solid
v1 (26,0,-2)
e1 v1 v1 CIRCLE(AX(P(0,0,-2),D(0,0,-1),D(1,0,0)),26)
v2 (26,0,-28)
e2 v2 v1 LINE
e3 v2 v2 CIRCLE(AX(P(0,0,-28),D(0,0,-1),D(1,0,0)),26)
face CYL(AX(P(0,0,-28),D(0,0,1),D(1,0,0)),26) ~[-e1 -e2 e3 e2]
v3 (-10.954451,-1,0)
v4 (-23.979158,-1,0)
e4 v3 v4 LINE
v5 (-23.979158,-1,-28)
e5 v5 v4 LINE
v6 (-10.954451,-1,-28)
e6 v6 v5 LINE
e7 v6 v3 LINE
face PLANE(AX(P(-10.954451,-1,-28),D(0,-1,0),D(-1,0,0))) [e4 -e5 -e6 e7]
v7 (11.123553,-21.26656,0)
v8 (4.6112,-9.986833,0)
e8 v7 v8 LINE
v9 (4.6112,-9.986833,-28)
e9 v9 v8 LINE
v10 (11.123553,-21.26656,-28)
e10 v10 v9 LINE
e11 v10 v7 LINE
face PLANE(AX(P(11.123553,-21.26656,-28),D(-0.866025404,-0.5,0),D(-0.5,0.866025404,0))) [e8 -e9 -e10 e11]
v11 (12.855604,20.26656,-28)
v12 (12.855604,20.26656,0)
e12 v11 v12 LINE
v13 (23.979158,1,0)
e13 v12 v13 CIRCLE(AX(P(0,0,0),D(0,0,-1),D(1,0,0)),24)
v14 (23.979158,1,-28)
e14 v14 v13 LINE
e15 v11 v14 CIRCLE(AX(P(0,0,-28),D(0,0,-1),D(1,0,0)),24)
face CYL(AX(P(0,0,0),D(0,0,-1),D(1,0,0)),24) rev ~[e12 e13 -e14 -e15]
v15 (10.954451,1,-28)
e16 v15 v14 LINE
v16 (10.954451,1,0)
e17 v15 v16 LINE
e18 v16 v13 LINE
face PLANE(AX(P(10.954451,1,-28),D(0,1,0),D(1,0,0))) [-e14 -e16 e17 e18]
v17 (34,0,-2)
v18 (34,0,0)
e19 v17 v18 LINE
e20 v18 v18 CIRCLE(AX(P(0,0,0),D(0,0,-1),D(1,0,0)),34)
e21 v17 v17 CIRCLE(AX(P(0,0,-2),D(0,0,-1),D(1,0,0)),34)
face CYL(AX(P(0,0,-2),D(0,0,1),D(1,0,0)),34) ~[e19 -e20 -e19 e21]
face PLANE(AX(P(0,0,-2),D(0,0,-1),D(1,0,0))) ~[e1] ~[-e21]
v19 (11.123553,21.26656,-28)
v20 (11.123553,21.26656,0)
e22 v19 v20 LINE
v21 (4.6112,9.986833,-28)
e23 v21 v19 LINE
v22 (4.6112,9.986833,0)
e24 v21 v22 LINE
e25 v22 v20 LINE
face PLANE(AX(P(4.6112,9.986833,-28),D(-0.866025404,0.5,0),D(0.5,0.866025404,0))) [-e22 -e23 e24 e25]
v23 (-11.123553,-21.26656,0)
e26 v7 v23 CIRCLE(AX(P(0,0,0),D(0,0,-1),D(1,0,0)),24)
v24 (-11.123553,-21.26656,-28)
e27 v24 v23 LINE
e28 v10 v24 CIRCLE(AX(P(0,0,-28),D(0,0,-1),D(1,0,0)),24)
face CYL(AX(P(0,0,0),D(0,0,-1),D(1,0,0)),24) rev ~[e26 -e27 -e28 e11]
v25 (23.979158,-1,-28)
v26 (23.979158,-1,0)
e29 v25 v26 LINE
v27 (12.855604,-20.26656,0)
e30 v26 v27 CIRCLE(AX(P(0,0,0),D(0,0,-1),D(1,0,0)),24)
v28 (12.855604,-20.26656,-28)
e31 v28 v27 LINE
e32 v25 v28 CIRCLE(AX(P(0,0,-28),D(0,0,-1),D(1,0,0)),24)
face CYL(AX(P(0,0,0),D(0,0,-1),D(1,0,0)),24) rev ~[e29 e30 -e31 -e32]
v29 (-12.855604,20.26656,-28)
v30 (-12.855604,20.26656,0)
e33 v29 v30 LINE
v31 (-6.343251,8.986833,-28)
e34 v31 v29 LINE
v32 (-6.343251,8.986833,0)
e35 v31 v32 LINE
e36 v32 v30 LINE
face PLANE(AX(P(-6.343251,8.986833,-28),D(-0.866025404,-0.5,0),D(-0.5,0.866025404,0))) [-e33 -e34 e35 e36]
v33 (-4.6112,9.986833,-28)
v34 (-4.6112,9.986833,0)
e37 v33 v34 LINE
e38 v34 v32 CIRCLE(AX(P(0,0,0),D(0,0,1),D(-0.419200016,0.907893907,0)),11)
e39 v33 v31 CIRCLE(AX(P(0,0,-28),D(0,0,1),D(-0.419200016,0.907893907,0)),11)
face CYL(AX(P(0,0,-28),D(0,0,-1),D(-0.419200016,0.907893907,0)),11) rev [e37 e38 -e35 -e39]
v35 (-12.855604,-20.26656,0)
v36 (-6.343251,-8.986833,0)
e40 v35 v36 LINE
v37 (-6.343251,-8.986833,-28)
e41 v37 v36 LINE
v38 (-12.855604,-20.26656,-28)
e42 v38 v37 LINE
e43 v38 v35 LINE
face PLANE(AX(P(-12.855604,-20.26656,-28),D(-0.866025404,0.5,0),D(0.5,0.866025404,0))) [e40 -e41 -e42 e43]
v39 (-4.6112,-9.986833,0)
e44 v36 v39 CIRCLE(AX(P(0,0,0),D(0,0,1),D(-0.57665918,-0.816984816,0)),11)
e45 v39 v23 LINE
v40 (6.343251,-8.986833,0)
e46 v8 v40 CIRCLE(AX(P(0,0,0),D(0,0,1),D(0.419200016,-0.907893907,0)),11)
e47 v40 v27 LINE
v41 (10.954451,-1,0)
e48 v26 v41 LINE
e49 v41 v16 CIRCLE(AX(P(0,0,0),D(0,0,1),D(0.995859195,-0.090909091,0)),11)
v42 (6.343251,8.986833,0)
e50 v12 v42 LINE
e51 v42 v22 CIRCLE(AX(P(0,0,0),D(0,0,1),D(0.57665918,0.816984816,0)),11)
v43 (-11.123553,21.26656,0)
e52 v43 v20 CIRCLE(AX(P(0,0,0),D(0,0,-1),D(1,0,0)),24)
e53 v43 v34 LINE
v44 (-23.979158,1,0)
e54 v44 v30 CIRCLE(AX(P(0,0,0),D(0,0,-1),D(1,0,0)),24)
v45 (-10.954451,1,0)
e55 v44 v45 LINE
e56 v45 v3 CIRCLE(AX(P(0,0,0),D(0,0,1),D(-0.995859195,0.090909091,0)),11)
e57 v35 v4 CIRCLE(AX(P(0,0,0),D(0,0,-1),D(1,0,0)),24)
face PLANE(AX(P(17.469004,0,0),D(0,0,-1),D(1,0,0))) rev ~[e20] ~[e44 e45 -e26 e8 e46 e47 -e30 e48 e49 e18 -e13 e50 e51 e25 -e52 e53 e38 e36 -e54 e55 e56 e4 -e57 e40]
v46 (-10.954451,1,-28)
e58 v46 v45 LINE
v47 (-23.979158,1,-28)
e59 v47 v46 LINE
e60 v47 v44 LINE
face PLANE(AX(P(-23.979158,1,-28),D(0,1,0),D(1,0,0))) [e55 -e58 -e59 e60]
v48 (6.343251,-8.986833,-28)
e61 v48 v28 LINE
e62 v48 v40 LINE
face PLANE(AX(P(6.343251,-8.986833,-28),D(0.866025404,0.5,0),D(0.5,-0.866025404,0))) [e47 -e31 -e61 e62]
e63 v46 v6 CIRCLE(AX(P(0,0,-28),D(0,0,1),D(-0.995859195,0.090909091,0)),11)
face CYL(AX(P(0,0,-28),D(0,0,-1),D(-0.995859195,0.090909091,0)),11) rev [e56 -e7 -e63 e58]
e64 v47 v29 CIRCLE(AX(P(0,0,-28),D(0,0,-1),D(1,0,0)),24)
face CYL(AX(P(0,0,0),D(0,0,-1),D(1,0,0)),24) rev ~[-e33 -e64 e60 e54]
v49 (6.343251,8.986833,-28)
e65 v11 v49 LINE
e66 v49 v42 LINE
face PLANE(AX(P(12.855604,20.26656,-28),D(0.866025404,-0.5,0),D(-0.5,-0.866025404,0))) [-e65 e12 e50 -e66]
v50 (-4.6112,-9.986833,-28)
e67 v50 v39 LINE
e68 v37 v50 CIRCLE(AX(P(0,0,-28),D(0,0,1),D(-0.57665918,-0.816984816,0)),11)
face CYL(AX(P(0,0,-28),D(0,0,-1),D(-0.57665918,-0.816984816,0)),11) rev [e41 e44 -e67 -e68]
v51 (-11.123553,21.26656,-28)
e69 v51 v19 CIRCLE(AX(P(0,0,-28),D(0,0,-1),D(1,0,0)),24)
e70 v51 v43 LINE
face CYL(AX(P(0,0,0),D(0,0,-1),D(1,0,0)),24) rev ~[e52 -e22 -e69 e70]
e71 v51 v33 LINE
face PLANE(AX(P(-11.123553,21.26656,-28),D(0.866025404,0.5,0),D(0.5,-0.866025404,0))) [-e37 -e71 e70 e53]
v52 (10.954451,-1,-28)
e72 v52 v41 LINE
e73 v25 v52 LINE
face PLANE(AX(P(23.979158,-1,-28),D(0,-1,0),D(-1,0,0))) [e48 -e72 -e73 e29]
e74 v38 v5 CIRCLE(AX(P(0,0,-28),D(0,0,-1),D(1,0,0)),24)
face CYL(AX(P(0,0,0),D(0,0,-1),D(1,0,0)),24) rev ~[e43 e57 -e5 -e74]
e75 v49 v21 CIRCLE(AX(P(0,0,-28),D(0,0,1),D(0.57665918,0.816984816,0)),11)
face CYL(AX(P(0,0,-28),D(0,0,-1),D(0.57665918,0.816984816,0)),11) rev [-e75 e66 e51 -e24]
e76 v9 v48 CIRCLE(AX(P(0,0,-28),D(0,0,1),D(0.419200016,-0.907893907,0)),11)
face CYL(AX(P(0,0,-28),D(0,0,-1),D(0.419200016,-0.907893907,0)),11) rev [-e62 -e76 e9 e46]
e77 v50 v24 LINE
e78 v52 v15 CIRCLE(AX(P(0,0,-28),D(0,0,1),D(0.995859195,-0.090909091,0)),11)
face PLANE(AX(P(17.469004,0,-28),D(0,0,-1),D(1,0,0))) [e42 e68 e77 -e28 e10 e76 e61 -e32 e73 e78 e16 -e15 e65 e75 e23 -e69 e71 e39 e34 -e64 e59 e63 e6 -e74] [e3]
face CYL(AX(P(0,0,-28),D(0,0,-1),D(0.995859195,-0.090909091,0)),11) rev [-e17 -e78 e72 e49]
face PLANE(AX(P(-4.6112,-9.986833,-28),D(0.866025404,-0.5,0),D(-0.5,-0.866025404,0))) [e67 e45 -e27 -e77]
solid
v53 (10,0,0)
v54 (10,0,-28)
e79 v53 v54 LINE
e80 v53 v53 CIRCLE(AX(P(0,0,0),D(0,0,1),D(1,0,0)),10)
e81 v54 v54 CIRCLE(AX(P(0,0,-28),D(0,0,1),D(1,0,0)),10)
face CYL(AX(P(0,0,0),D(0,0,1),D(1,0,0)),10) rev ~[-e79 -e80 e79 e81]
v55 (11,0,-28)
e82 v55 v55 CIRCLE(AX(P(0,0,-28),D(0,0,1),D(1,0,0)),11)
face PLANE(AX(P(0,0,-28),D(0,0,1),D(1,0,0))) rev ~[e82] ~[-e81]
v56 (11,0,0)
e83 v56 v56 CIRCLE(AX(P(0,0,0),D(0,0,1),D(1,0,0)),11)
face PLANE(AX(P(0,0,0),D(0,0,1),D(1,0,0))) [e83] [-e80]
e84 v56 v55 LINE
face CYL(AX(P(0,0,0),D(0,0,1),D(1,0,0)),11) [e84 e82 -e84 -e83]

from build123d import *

# Parameters (mm, degrees)
F2_R     = 11
F2_R_2   = 10
F3_DEPTH = 28
F5_DEPTH = 28


with BuildPart() as f1:
    # F0 (on Front) → F1 (revolve)
    with BuildSketch(Plane.XZ):
        Polygon((34, 0), (24, 0), (24, -28), (26, -28), (26, -2), (34, -2), align=None)
    revolve(axis=Axis((0, 0, -3.8373200223), (0, 0, -1)))

    # F4 (on face) → F5 (join, through all)
    with BuildSketch(Plane(origin=(0, 0, -28), x_dir=(1, 0, 0), z_dir=(0, 0, -1))):
        with BuildLine():
            Line((-10.9544511501, 1), (-23.9791576166, 1))
            ThreePointArc((-23.9791576166, 1), (-24, 0), (-23.9791576166, -1))
            Line((-23.9791576166, -1), (-10.9544511501, -1))
            ThreePointArc((-10.9544511501, -1), (-11, 0), (-10.9544511501, 1))
        make_face()
        with BuildLine():
            Line((-6.3432509788, -8.9868329805), (-12.8556042121, -20.2665596573))
            ThreePointArc((-12.8556042121, -20.2665596573), (-12, -20.7846096908), (-11.1235534045, -21.2665596573))
            Line((-11.1235534045, -21.2665596573), (-4.6112001713, -9.9868329805))
            ThreePointArc((-4.6112001713, -9.9868329805), (-5.5, -9.5262794416), (-6.3432509788, -8.9868329805))
        make_face()
        with BuildLine():
            Line((4.6112001713, -9.9868329805), (11.1235534045, -21.2665596573))
            ThreePointArc((11.1235534045, -21.2665596573), (12, -20.7846096908), (12.8556042121, -20.2665596573))
            Line((12.8556042121, -20.2665596573), (6.3432509788, -8.9868329805))
            ThreePointArc((6.3432509788, -8.9868329805), (5.5, -9.5262794416), (4.6112001713, -9.9868329805))
        make_face()
        with BuildLine():
            Line((10.9544511501, -1), (23.9791576166, -1))
            ThreePointArc((23.9791576166, -1), (24, 0), (23.9791576166, 1))
            Line((23.9791576166, 1), (10.9544511501, 1))
            ThreePointArc((10.9544511501, 1), (11, 0), (10.9544511501, -1))
        make_face()
        with BuildLine():
            Line((6.3432509788, 8.9868329805), (12.8556042121, 20.2665596573))
            ThreePointArc((12.8556042121, 20.2665596573), (12, 20.7846096908), (11.1235534045, 21.2665596573))
            Line((11.1235534045, 21.2665596573), (4.6112001713, 9.9868329805))
            ThreePointArc((4.6112001713, 9.9868329805), (5.5, 9.5262794416), (6.3432509788, 8.9868329805))
        make_face()
        with BuildLine():
            Line((-4.6112001713, 9.9868329805), (-11.1235534045, 21.2665596573))
            ThreePointArc((-11.1235534045, 21.2665596573), (-12, 20.7846096908), (-12.8556042121, 20.2665596573))
            Line((-12.8556042121, 20.2665596573), (-6.3432509788, 8.9868329805))
            ThreePointArc((-6.3432509788, 8.9868329805), (-5.5, 9.5262794416), (-4.6112001713, 9.9868329805))
        make_face()
    extrude(amount=-F5_DEPTH)


with BuildPart() as f3:
    # F2 (on Top) → F3 (new body, through all)
    with BuildSketch(Plane.XY):
        Circle(F2_R)
        Circle(F2_R_2, mode=Mode.SUBTRACT)
    extrude(amount=-F3_DEPTH)


solid = Compound([f1.part, f3.part])
